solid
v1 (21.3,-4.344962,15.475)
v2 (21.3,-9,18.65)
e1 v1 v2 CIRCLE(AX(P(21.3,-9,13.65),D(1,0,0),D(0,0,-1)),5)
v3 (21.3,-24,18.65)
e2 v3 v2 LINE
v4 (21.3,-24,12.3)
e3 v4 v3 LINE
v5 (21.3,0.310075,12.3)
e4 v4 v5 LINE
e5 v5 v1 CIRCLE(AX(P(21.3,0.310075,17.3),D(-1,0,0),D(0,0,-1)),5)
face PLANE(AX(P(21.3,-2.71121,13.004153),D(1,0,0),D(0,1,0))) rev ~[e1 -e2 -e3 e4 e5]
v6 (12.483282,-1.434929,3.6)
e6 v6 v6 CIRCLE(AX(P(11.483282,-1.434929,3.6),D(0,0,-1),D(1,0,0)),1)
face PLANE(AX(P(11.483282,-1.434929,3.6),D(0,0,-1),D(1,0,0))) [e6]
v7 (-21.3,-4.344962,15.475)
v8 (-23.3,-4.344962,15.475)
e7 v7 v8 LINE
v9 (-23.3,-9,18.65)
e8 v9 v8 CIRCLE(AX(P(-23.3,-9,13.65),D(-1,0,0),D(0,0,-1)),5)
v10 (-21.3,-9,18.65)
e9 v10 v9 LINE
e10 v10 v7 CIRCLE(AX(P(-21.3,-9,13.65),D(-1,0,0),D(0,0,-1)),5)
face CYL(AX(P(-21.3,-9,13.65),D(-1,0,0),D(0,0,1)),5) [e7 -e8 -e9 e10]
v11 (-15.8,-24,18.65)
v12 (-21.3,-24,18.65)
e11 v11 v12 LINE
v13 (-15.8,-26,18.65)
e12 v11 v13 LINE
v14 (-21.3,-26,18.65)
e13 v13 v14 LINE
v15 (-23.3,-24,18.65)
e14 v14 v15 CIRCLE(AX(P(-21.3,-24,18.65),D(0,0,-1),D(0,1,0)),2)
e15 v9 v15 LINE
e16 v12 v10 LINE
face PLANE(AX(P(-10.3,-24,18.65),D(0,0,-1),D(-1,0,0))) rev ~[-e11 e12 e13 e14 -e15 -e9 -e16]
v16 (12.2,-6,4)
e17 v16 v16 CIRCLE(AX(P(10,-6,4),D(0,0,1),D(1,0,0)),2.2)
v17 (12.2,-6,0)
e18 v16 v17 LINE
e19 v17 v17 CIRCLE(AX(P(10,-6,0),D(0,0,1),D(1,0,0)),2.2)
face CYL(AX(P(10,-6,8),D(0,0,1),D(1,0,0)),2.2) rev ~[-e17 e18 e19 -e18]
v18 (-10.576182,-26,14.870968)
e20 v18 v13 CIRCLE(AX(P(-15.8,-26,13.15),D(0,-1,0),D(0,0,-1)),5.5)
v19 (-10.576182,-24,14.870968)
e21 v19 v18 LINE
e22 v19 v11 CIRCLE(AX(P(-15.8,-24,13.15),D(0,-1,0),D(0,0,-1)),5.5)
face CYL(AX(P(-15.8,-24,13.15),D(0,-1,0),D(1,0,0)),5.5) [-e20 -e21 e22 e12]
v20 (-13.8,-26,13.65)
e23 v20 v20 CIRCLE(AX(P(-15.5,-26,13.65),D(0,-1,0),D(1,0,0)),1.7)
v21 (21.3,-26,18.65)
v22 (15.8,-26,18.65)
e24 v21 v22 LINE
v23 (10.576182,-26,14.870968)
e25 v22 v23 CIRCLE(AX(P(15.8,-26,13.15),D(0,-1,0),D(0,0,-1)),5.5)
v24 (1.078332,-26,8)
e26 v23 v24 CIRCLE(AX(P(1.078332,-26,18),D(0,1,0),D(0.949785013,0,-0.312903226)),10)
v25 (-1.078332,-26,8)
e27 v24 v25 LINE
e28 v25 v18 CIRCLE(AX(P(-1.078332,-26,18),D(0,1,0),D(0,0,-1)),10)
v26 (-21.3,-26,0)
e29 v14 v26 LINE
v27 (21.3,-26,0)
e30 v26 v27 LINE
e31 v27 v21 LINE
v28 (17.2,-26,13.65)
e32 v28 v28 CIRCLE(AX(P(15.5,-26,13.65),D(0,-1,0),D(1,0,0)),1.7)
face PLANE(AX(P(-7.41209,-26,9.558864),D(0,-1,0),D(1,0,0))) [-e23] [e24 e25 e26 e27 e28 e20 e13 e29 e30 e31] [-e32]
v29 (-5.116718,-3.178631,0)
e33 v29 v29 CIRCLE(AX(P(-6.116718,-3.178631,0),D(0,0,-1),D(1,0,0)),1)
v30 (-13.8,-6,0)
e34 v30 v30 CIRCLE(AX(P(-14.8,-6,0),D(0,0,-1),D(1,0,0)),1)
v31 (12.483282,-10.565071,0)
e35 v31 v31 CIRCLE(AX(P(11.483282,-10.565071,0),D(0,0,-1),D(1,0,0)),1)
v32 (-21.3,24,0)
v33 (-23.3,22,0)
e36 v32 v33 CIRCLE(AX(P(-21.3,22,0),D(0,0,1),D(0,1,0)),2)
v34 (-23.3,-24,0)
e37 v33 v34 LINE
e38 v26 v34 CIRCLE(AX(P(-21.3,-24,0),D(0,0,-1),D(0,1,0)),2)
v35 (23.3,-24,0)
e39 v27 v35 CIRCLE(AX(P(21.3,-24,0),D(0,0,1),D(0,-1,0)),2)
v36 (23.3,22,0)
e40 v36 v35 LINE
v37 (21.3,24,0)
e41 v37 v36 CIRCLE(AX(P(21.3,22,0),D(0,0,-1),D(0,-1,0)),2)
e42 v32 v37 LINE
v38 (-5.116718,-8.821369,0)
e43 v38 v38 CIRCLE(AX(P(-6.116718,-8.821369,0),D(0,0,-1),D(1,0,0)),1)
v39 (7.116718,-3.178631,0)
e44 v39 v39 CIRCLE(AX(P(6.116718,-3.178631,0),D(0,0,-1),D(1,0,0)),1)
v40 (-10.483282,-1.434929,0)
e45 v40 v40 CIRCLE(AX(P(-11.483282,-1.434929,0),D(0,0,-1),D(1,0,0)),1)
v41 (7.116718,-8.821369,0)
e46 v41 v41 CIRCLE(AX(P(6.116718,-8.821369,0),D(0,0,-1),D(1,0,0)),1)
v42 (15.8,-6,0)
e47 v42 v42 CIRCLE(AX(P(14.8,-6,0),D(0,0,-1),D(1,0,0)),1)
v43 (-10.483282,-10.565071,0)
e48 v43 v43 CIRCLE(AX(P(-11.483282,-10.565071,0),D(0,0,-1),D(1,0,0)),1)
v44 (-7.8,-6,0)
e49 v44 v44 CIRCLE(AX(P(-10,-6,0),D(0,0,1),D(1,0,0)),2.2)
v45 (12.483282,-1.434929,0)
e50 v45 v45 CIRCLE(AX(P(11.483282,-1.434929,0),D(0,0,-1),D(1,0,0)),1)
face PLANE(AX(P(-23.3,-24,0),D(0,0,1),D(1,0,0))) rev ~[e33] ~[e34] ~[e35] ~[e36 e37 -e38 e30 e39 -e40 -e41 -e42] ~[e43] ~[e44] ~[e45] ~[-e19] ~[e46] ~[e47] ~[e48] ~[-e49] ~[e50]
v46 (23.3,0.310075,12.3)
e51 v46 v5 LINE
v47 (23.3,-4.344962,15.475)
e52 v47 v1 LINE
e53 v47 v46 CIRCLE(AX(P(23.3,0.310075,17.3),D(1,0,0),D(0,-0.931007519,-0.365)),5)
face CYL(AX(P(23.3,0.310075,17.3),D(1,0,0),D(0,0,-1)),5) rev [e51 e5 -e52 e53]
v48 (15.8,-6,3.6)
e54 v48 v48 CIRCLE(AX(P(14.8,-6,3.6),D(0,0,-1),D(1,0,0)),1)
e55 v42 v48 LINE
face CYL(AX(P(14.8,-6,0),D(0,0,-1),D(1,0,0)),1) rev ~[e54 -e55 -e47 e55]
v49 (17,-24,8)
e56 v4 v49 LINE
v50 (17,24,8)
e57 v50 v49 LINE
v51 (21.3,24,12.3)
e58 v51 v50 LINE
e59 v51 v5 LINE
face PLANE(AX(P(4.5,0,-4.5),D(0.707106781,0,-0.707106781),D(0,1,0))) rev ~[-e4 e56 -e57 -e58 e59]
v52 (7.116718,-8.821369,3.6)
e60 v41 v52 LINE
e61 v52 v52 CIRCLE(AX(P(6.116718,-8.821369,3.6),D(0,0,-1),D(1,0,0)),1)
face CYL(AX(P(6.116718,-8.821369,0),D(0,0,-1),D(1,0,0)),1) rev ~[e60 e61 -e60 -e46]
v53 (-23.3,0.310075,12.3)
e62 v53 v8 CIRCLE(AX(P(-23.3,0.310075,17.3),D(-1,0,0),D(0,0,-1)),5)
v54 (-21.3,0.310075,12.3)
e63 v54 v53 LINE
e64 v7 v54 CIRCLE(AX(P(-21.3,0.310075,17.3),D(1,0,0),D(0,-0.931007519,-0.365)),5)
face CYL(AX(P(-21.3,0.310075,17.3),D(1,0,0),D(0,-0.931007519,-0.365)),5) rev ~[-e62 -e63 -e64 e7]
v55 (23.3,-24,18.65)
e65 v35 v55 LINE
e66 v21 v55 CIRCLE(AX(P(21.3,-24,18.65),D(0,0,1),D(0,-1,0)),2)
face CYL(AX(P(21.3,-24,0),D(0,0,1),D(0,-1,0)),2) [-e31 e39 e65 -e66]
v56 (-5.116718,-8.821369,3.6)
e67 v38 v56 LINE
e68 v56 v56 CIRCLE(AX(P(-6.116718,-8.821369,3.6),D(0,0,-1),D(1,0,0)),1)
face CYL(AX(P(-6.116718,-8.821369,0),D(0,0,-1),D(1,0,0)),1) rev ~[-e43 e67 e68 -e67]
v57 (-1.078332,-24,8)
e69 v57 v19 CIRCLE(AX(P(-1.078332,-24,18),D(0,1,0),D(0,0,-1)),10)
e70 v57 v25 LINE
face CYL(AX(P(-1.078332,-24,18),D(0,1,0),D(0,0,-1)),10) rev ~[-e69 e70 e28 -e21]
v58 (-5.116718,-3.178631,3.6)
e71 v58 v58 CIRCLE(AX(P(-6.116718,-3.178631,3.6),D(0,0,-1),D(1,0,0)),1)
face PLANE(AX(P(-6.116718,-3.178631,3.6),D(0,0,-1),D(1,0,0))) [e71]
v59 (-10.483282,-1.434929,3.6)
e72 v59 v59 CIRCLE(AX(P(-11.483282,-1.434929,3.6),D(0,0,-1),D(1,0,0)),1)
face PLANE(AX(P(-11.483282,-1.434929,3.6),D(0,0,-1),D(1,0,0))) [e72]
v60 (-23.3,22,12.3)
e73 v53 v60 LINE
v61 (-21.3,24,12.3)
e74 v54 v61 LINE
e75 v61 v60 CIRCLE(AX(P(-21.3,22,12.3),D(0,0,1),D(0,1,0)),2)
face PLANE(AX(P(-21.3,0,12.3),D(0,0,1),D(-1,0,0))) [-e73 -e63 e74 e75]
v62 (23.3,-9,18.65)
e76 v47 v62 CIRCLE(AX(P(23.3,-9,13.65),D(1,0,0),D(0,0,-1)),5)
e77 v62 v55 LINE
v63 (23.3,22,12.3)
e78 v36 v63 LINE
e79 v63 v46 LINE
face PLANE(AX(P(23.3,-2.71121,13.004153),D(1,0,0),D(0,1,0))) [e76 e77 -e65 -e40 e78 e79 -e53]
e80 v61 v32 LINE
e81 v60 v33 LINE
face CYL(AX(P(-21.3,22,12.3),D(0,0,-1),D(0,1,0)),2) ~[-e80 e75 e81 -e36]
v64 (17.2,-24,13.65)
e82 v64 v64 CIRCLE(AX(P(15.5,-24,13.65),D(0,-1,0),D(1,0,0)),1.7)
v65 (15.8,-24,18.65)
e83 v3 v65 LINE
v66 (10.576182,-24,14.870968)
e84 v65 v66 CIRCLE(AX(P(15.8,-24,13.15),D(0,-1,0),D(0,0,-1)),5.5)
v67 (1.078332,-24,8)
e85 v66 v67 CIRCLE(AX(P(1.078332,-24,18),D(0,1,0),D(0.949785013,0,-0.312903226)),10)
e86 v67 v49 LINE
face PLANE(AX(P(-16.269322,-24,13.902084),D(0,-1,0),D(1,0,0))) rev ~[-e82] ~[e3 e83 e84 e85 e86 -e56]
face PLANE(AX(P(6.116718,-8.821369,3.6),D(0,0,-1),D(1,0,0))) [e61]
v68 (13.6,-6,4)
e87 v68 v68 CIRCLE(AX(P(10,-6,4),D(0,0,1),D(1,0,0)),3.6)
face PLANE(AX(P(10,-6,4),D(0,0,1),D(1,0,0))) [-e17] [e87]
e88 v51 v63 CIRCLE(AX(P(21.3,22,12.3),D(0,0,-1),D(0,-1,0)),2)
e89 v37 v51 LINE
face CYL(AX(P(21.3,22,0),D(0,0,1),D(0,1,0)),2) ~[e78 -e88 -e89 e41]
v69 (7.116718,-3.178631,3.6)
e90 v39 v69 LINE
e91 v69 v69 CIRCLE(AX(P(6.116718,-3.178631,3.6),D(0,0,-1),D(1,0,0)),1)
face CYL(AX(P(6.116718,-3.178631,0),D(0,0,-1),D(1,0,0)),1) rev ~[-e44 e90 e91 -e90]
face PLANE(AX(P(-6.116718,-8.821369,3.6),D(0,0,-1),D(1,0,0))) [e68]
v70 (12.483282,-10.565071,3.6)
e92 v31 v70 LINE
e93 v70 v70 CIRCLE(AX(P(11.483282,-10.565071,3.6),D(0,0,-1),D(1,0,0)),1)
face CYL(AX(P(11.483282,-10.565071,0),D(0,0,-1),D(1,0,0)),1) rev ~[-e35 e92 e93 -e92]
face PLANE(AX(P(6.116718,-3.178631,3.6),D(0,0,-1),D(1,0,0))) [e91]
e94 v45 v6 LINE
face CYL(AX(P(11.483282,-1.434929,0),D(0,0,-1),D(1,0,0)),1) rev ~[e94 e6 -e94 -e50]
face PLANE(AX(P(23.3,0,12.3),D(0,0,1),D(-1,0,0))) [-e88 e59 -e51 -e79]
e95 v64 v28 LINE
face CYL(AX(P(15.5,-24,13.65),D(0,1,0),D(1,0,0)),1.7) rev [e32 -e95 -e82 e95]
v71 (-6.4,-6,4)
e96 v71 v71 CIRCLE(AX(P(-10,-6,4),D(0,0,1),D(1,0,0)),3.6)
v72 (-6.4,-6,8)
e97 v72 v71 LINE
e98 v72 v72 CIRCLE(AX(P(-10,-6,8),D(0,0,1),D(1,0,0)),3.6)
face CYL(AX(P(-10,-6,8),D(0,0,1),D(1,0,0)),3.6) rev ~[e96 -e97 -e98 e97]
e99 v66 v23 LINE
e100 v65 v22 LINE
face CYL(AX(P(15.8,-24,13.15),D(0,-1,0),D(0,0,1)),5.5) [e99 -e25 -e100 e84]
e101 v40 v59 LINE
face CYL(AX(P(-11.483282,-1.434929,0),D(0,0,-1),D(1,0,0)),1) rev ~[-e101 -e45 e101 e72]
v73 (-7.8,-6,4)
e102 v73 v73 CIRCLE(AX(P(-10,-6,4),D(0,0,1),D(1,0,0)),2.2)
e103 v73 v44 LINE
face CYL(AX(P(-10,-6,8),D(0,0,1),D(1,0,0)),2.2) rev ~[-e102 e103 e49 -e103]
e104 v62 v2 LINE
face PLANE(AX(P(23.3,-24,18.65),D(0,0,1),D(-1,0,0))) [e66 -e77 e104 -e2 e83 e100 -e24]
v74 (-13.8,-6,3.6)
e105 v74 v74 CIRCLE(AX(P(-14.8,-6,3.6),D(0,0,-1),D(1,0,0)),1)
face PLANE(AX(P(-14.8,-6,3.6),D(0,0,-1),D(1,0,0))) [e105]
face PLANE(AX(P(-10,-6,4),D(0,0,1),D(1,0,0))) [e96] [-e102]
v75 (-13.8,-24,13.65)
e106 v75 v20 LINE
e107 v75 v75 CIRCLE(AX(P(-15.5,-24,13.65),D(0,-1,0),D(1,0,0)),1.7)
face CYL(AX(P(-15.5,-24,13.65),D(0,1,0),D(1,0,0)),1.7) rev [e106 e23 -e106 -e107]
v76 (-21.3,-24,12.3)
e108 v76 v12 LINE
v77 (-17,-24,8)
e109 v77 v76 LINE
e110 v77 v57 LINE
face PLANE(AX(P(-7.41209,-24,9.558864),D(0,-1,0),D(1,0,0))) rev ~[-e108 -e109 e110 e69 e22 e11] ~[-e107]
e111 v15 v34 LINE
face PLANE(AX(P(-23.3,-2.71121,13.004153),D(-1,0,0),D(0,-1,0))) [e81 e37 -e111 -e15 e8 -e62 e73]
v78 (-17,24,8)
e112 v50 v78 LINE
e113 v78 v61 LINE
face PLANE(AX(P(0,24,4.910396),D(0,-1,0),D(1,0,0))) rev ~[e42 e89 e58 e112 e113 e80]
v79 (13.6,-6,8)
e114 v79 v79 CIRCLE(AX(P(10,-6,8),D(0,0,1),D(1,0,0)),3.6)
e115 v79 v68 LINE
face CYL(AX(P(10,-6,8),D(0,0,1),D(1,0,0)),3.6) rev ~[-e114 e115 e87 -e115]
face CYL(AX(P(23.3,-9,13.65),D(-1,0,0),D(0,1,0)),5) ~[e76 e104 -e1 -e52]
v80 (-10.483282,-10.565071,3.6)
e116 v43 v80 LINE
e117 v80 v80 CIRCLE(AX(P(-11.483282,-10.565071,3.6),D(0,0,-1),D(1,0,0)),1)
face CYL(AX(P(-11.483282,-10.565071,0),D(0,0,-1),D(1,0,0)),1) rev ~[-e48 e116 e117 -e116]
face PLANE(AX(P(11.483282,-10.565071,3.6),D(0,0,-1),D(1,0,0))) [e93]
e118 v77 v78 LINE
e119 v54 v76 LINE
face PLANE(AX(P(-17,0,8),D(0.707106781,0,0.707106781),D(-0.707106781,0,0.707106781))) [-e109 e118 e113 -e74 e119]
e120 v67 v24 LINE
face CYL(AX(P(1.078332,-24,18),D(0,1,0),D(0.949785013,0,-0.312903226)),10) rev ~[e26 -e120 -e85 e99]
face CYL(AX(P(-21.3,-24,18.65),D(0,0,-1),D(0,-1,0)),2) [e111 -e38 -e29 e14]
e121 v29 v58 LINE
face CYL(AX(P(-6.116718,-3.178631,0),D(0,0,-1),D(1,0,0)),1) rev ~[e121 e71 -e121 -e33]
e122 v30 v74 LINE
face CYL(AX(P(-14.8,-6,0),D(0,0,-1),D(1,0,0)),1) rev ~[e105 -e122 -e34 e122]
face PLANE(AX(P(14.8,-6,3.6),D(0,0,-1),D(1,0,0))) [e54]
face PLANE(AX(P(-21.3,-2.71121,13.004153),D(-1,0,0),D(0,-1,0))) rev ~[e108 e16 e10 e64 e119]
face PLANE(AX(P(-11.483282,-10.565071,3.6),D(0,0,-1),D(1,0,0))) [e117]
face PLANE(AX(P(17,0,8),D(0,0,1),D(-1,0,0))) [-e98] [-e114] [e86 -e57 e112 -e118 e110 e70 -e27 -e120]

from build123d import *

# Parameters (mm, degrees)
F1_DEPTH     = 24
F2_R         = 1.7
F3_DEPTH     = 2
F4_R         = 5.5
F5_T1_DEPTH  = 2
F6_W         = 2
F6_H         = 6.35
F7_DEPTH     = 20
F8_R         = 5
F9_T4_DEPTH  = 2
F9_T9_DEPTH  = 12.7751879692
F9_T15_DEPTH = 2
F9_T20_DEPTH = 2
F9_T25_DEPTH = 2
F9_T30_DEPTH = 12.7751879692
F10_R        = 2.2
F11_DEPTH    = 8
F10_R_2      = 3.6
F12_DEPTH    = 4
F13_R        = 1
F14_DEPTH    = 3.6
F15_R        = 2


# Not quite as in the source:
# - a fillet or chamfer that OpenCascade refuses, or shapes differently, is made with other operations: its cross-section is extruded or revolved along the edge and cut away or added


with BuildPart() as f1:
    # F0 (on Front) → F1 (new body, symmetric)
    with BuildSketch(Plane.XZ):
        Polygon((-23.3, 12.3), (-23.3, 0), (0, 0), (23.3, 0), (23.3, 12.3), (21.3, 12.3), (17, 8), (0, 8), (-17, 8), (-21.3, 12.3), align=None)
    extrude(amount=F1_DEPTH, both=True)

    # F2 (on face) → F3 (join)
    with BuildSketch(Plane.XZ.offset(24)):
        Polygon((-23.3, 18.65), (-23.3, 12.3), (-21.3, 12.3), (-17, 8), (-10.3, 8), (-10.3, 18.65), align=None)
        with Locations((-15.5, 13.65)):
            Circle(F2_R, mode=Mode.SUBTRACT)
        Polygon((21.3, 12.3), (23.3, 12.3), (23.3, 18.65), (10.3, 18.65), (10.3, 8), (17, 8), align=None)
        with Locations((15.5, 13.65)):
            Circle(F2_R, mode=Mode.SUBTRACT)
        Polygon((-21.3, 12.3), (-23.3, 12.3), (-23.3, 0), (23.3, 0), (23.3, 12.3), (21.3, 12.3), (17, 8), (10.3, 8), (-10.3, 8), (-17, 8), align=None)
    extrude(amount=F3_DEPTH)

    # F4
    f4_edges = [f1.edges().sort_by_distance(p)[0] for p in [
        (-10.3, -25, 18.65),
        (10.3, -25, 18.65),
    ]]
    fillet(f4_edges, radius=F4_R)

    # F5: fillet of radius 10 on 2 edges, made by hand

    # F5_s2 → F5_t1 (join)
    with BuildSketch(Plane.XZ.offset(24)):
        with BuildLine():
            ThreePointArc((-1.0783322956, 8), (-6.9396323825, 9.8978298407), (-10.5761824275, 14.8709677419))
            Line((-10.5761824275, 14.8709677419), (-11.5259674406, 14.5580645161))
            ThreePointArc((-11.5259674406, 14.5580645161), (-11.3, 13.15), (-11.3, 8))
            Line((-11.3, 8), (-10.3, 7))
            Line((-10.3, 7), (-1.0783322956, 7))
            Line((-1.0783322956, 7), (-1.0783322956, 8))
        make_face()
        with BuildLine():
            ThreePointArc((10.5761824275, 14.8709677419), (6.9396323825, 9.8978298407), (1.0783322956, 8))
            Line((1.0783322956, 8), (1.0783322956, 7))
            Line((1.0783322956, 7), (10.3, 7))
            Line((10.3, 7), (11.3, 8))
            ThreePointArc((11.3, 8), (11.3, 13.15), (11.5259674406, 14.5580645161))
            Line((11.5259674406, 14.5580645161), (10.5761824275, 14.8709677419))
        make_face()
    extrude(amount=F5_T1_DEPTH)

    # F6 (on face) → F7 (join)
    with BuildSketch(Plane(origin=(0, -24, 0), x_dir=(-1, 0, 0), z_dir=(0, 1, 0))):
        with Locations((-22.3, 15.475)):
            Rectangle(F6_W, F6_H)
        with Locations((22.3, 15.475)):
            Rectangle(F6_W, F6_H)
    extrude(amount=F7_DEPTH)

    # F8
    f8_edges = [f1.edges().sort_by_distance(p)[0] for p in [
        (22.3, -4, 18.65),
        (-22.3, -4, 18.65),
    ]]
    fillet(f8_edges, radius=F8_R)

    # F9: fillet of radius 5 on 2 edges, made by hand


with BuildPart() as f9_tool2:
    # F9_s3 → F9_t4 (new body)
    with BuildSketch(Plane.YZ.offset(-21.3)):
        with BuildLine():
            ThreePointArc((-4.3449624062, 15.475), (-2.5072817297, 13.1693220895), (0.3100751877, 12.3))
            Line((0.3100751877, 12.3), (0.3100751877, 11.8))
            Line((0.3100751877, 11.8), (-4, 11.8))
            Line((-4, 11.8), (-4.5, 12.3))
            ThreePointArc((-4.5, 12.3), (-4.5, 13.65), (-4.8104661656, 15.2925))
            Line((-4.8104661656, 15.2925), (-4.3449624062, 15.475))
        make_face()
    extrude(amount=-F9_T4_DEPTH)

    split(bisect_by=Plane(origin=(-4.5, 0, -4.5), x_dir=(0, 1, 0), z_dir=(0.7071067812, 0, 0.7071067812)), keep=Keep.TOP)


with BuildPart() as f1_1:
    add(f1.part)

    # F9_t1: union F9_tool2
    add(f9_tool2.part)


with BuildPart() as f9_tool7:
    # F9_s8 → F9_t9 (new body)
    with BuildSketch(Plane.YZ.offset(-10.5248120308)):
        with BuildLine():
            ThreePointArc((-4.3449624062, 15.475), (-2.5072817297, 13.1693220895), (0.3100751877, 12.3))
            Line((0.3100751877, 12.3), (0.3100751877, 11.8))
            Line((0.3100751877, 11.8), (-4, 11.8))
            Line((-4, 11.8), (-4.5, 12.3))
            ThreePointArc((-4.5, 12.3), (-4.5, 13.65), (-4.8104661656, 15.2925))
            Line((-4.8104661656, 15.2925), (-4.3449624062, 15.475))
        make_face()
    extrude(amount=-F9_T9_DEPTH)

    split(bisect_by=Plane.YZ.offset(-21.3), keep=Keep.TOP)

    split(bisect_by=Plane(origin=(-4.5, 0, -4.5), x_dir=(0, 1, 0), z_dir=(-0.7071067812, 0, -0.7071067812)), keep=Keep.TOP)


with BuildPart() as f1_2:
    add(f1_1.part)

    # F9_t6: union F9_tool7
    add(f9_tool7.part)


with BuildPart() as f9_tool13:
    # F9_s14 → F9_t15 (new body)
    with BuildSketch(Plane.YZ.offset(-21.3)):
        with BuildLine():
            ThreePointArc((-4.3449624062, 15.475), (-2.5072817297, 13.1693220895), (0.3100751877, 12.3))
            Line((0.3100751877, 12.3), (0.3100751877, 11.8))
            Line((0.3100751877, 11.8), (-4, 11.8))
            Line((-4, 11.8), (-4.5, 12.3))
            ThreePointArc((-4.5, 12.3), (-4.5, 13.65), (-4.8104661656, 15.2925))
            Line((-4.8104661656, 15.2925), (-4.3449624062, 15.475))
        make_face()
    extrude(amount=-F9_T15_DEPTH)

    split(bisect_by=Plane(origin=(-4.5, 0, -4.5), x_dir=(0, 1, 0), z_dir=(-0.7071067812, 0, -0.7071067812)), keep=Keep.TOP)


with BuildPart() as f1_3:
    add(f1_2.part)

    # F9_t12: union F9_tool13
    add(f9_tool13.part)


with BuildPart() as f9_tool18:
    # F9_s19 → F9_t20 (new body)
    with BuildSketch(Plane.YZ.offset(23.3)):
        with BuildLine():
            ThreePointArc((0.3100751877, 12.3), (-2.5072817297, 13.1693220895), (-4.3449624062, 15.475))
            Line((-4.3449624062, 15.475), (-4.8104661656, 15.2925))
            ThreePointArc((-4.8104661656, 15.2925), (-4.5, 13.65), (-4.5, 12.3))
            Line((-4.5, 12.3), (-4, 11.8))
            Line((-4, 11.8), (0.3100751877, 11.8))
            Line((0.3100751877, 11.8), (0.3100751877, 12.3))
        make_face()
    extrude(amount=-F9_T20_DEPTH)

    split(bisect_by=Plane(origin=(4.5, 0, -4.5), x_dir=(0, 1, 0), z_dir=(0.7071067812, 0, -0.7071067812)), keep=Keep.TOP)


with BuildPart() as f1_4:
    add(f1_3.part)

    # F9_t17: union F9_tool18
    add(f9_tool18.part)


with BuildPart() as f9_tool23:
    # F9_s24 → F9_t25 (new body)
    with BuildSketch(Plane.YZ.offset(23.3)):
        with BuildLine():
            ThreePointArc((0.3100751877, 12.3), (-2.5072817297, 13.1693220895), (-4.3449624062, 15.475))
            Line((-4.3449624062, 15.475), (-4.8104661656, 15.2925))
            ThreePointArc((-4.8104661656, 15.2925), (-4.5, 13.65), (-4.5, 12.3))
            Line((-4.5, 12.3), (-4, 11.8))
            Line((-4, 11.8), (0.3100751877, 11.8))
            Line((0.3100751877, 11.8), (0.3100751877, 12.3))
        make_face()
    extrude(amount=-F9_T25_DEPTH)

    split(bisect_by=Plane(origin=(4.5, 0, -4.5), x_dir=(0, 1, 0), z_dir=(-0.7071067812, 0, 0.7071067812)), keep=Keep.TOP)


with BuildPart() as f1_5:
    add(f1_4.part)

    # F9_t22: union F9_tool23
    add(f9_tool23.part)


with BuildPart() as f9_tool28:
    # F9_s29 → F9_t30 (new body)
    with BuildSketch(Plane.YZ.offset(23.3)):
        with BuildLine():
            ThreePointArc((0.3100751877, 12.3), (-2.5072817297, 13.1693220895), (-4.3449624062, 15.475))
            Line((-4.3449624062, 15.475), (-4.8104661656, 15.2925))
            ThreePointArc((-4.8104661656, 15.2925), (-4.5, 13.65), (-4.5, 12.3))
            Line((-4.5, 12.3), (-4, 11.8))
            Line((-4, 11.8), (0.3100751877, 11.8))
            Line((0.3100751877, 11.8), (0.3100751877, 12.3))
        make_face()
    extrude(amount=-F9_T30_DEPTH)

    split(bisect_by=Plane(origin=(4.5, 0, -4.5), x_dir=(0, 1, 0), z_dir=(0.7071067812, 0, -0.7071067812)), keep=Keep.TOP)

    split(bisect_by=Plane.YZ.offset(21.3), keep=Keep.BOTTOM)


with BuildPart() as f1_6:
    add(f1_5.part)

    # F9_t27: union F9_tool28
    add(f9_tool28.part)

    # F10 (on face) → F11 (cut)
    with BuildSketch(Plane.XY.offset(8)):
        with Locations((10, -6)):
            Circle(F10_R)
        with Locations((-10, -6)):
            Circle(F10_R)
    extrude(amount=-F11_DEPTH, mode=Mode.SUBTRACT)

    # F10 (on face) → F12 (cut)
    with BuildSketch(Plane.XY.offset(8)):
        with Locations((10, -6)):
            Circle(F10_R_2)
        with Locations((10, -6)):
            Circle(F10_R, mode=Mode.SUBTRACT)
        with Locations((-10, -6)):
            Circle(F10_R_2)
        with Locations((-10, -6)):
            Circle(F10_R, mode=Mode.SUBTRACT)
    extrude(amount=-F12_DEPTH, mode=Mode.SUBTRACT)

    # F13 (on face) → F14 (cut)
    with BuildSketch(Plane(origin=(0, 0, 0), x_dir=(1, 0, 0), z_dir=(0, 0, -1))):
        with Locations((6.116718427, 3.178630789)):
            Circle(F13_R)
        with Locations((6.116718427, 8.821369211)):
            Circle(F13_R)
        with Locations((11.483281573, 10.5650712782)):
            Circle(F13_R)
        with Locations((11.483281573, 1.4349287218)):
            Circle(F13_R)
        with Locations((14.8, 6)):
            Circle(F13_R)
        with Locations((-11.483281573, 10.5650712782)):
            Circle(F13_R)
        with Locations((-14.8, 6)):
            Circle(F13_R)
        with Locations((-11.483281573, 1.4349287218)):
            Circle(F13_R)
        with Locations((-6.116718427, 3.178630789)):
            Circle(F13_R)
        with Locations((-6.116718427, 8.821369211)):
            Circle(F13_R)
    extrude(amount=-F14_DEPTH, mode=Mode.SUBTRACT)

    # F15
    f15_edges = [f1_6.edges().sort_by_distance(p)[0] for p in [
        (-23.3, 24, 6.15),
        (23.3, 24, 6.15),
        (-23.3, -26, 9.325),
        (23.3, -26, 9.325),
    ]]
    fillet(f15_edges, radius=F15_R)


solid = f1_6.part
